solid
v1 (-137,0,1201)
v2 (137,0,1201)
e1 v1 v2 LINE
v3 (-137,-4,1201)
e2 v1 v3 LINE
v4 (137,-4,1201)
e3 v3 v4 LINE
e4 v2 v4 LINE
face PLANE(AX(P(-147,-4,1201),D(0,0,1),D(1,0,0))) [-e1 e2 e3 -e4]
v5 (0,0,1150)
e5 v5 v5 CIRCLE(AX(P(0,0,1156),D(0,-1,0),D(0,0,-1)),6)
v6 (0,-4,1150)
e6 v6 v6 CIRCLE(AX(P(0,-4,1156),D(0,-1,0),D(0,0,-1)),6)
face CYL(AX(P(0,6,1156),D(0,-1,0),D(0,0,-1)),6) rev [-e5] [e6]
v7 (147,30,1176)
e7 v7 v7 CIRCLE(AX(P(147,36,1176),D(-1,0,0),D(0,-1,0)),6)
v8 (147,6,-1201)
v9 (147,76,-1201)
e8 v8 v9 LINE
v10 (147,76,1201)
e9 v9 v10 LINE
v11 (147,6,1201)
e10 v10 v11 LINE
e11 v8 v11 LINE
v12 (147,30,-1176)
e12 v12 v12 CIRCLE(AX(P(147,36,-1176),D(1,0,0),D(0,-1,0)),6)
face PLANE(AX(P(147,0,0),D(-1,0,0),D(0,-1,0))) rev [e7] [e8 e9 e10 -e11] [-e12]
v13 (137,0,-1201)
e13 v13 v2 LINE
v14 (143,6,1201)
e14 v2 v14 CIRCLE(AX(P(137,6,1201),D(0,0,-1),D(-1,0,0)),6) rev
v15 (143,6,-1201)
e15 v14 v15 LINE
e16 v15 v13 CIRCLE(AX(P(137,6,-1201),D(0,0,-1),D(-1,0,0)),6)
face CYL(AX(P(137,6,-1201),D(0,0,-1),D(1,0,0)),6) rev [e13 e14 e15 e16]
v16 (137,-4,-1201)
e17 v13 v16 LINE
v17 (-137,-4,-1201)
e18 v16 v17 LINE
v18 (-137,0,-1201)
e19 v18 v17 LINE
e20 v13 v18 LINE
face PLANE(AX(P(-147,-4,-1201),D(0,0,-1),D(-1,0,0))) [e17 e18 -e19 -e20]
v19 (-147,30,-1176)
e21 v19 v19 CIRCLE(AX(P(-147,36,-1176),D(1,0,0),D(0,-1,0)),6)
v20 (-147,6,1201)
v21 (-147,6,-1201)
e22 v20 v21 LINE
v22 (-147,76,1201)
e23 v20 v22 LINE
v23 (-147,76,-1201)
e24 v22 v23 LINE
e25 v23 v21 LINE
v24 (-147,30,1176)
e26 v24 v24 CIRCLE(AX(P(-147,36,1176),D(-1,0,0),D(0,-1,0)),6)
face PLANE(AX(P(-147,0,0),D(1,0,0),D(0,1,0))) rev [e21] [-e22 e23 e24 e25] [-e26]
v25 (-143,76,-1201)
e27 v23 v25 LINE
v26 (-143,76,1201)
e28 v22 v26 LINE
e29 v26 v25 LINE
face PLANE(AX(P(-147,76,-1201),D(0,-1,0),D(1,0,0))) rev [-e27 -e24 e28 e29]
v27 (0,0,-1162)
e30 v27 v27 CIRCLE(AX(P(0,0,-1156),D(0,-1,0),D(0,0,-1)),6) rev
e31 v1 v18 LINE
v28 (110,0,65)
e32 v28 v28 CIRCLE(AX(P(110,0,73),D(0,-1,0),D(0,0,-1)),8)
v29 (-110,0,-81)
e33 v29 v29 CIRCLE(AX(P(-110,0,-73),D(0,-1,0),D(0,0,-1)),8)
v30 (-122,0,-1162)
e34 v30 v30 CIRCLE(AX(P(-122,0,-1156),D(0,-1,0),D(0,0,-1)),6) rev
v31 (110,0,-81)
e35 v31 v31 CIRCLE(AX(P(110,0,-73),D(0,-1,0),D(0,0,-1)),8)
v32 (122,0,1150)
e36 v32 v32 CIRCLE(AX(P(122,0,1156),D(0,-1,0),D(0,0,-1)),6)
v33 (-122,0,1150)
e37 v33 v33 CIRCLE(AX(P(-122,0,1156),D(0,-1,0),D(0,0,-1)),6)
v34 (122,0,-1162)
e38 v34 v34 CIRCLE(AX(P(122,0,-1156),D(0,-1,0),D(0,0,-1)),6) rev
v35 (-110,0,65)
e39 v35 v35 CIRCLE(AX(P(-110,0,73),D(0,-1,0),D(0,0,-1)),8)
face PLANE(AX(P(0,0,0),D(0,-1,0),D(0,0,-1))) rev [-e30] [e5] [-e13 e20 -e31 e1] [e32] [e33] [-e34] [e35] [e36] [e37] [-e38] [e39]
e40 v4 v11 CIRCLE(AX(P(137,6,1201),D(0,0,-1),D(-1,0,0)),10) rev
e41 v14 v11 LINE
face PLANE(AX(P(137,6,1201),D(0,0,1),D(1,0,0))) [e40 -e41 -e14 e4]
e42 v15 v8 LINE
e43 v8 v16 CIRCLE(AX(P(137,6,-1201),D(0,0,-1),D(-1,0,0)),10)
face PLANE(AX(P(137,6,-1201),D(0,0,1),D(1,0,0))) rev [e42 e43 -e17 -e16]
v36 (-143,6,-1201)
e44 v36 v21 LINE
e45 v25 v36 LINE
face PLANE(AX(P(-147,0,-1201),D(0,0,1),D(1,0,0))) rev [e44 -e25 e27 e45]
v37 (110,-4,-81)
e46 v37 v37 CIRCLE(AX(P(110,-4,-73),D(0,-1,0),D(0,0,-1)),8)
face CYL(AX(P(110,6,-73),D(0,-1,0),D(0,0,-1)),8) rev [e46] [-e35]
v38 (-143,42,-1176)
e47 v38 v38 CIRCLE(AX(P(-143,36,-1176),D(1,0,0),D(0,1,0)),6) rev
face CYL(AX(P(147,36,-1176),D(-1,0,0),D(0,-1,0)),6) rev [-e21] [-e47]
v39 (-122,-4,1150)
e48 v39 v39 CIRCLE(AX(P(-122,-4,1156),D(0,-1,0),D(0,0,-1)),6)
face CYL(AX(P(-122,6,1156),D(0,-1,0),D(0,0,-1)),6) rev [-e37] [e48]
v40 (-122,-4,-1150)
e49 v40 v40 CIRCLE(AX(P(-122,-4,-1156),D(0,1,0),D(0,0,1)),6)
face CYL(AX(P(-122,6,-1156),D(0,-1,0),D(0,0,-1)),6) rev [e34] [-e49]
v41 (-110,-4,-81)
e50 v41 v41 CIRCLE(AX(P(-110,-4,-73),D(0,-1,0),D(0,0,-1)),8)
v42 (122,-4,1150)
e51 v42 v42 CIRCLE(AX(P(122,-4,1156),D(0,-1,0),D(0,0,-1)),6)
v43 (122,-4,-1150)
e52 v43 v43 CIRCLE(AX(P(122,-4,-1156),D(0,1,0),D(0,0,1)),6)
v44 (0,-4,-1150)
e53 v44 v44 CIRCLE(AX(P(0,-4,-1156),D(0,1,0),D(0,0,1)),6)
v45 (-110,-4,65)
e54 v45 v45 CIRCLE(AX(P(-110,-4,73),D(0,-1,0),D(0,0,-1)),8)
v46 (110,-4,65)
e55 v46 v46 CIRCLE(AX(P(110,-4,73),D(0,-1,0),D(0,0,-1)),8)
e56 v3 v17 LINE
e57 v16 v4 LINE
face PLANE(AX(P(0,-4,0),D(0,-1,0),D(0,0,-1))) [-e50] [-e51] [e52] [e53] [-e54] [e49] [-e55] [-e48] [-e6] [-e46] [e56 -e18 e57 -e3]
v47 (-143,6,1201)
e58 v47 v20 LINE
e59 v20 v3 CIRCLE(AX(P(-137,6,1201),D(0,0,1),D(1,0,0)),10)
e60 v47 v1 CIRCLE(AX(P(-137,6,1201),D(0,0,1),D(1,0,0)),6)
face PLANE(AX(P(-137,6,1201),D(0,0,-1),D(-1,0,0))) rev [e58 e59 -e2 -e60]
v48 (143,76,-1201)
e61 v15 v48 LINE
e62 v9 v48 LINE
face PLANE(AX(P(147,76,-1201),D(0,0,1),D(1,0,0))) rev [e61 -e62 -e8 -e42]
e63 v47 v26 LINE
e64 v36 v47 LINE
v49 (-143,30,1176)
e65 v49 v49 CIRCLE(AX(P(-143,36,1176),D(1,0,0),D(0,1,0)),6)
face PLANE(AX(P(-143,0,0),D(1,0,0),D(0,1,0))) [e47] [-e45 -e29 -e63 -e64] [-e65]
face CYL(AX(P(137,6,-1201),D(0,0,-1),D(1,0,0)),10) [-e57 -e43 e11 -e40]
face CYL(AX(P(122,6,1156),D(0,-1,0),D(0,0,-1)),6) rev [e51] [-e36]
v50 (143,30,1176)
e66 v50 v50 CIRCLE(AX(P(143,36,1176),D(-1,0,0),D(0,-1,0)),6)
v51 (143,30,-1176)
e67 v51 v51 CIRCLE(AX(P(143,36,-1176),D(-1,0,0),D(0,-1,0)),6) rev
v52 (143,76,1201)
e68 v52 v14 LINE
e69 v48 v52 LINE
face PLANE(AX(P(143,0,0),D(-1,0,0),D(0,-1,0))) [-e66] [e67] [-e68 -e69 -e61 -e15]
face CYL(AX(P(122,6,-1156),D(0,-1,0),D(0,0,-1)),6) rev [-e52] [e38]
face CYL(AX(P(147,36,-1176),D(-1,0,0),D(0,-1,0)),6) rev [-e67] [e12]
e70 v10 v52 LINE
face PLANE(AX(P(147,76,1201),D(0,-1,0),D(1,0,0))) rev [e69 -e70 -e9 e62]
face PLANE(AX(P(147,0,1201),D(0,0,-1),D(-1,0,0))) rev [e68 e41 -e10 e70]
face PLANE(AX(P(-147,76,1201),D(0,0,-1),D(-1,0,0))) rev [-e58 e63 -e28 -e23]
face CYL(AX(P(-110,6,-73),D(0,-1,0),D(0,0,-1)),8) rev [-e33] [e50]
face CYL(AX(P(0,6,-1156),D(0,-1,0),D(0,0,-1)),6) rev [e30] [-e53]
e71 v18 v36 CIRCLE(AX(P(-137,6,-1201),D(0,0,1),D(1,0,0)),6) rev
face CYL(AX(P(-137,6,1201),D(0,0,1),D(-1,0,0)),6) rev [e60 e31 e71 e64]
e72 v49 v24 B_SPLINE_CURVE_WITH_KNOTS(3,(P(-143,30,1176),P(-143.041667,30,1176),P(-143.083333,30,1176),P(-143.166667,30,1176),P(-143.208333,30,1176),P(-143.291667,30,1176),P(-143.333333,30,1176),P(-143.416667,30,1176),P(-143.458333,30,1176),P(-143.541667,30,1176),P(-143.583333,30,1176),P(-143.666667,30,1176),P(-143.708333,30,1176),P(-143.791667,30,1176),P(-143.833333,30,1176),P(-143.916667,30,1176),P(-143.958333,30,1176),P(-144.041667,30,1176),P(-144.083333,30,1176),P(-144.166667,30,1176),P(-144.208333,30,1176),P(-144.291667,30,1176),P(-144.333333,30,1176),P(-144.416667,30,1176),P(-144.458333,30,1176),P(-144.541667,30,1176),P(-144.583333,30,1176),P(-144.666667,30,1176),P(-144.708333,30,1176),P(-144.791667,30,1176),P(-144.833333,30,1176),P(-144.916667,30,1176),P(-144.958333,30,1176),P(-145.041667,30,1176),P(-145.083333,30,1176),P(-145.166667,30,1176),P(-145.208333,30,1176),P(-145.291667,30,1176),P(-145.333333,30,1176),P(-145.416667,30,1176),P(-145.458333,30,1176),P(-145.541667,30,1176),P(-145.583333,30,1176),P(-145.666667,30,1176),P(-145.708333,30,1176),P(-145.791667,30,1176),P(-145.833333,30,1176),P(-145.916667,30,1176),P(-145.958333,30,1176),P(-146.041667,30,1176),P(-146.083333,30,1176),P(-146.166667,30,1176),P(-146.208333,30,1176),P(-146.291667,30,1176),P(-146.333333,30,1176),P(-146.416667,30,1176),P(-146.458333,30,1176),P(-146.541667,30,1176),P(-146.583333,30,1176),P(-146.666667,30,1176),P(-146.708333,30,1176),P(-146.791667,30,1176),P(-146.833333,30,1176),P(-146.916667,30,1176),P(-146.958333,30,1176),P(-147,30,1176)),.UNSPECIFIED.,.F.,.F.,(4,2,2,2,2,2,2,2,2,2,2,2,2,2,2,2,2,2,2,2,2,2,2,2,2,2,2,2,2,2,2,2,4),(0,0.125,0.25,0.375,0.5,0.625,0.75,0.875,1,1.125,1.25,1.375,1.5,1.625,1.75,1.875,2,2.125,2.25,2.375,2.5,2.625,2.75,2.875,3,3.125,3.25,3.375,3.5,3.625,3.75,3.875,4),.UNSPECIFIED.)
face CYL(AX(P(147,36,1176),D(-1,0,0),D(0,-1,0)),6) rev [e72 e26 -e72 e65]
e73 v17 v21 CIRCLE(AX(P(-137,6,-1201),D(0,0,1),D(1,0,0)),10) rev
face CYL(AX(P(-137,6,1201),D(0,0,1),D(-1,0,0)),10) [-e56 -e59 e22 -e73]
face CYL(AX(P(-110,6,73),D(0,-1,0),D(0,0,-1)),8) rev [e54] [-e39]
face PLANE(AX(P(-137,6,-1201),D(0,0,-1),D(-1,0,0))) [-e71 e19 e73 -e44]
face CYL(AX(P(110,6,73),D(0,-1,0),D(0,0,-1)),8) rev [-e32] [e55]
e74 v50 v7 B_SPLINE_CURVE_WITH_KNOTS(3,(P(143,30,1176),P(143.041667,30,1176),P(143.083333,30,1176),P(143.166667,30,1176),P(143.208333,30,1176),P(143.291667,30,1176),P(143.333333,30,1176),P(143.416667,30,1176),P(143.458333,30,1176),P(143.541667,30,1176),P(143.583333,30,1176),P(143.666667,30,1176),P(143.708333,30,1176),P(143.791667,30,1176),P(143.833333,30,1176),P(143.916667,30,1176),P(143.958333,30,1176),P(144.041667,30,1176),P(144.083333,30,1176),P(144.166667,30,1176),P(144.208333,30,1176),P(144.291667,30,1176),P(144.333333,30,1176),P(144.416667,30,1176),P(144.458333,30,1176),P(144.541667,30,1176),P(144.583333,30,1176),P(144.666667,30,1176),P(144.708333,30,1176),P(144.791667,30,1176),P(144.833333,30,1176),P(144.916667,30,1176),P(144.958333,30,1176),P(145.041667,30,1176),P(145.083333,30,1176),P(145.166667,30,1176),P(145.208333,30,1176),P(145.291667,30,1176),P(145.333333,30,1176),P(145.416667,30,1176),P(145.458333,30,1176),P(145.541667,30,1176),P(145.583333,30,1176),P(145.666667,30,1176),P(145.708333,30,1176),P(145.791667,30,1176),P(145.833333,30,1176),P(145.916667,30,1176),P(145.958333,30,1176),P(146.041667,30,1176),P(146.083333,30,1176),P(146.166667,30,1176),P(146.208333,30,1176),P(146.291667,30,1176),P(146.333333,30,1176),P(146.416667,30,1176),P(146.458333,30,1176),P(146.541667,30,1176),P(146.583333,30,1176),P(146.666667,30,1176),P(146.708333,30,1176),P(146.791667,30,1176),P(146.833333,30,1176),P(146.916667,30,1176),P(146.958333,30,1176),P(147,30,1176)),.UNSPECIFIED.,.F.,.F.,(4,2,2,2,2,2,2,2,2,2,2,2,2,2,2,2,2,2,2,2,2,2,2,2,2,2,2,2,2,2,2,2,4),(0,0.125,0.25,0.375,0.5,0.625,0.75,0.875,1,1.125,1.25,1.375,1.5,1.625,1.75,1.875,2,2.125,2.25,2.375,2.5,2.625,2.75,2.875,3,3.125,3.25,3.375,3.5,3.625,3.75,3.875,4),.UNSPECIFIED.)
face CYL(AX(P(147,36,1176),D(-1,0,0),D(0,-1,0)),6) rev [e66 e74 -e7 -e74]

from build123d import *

# Parameters (mm, degrees)
SKETCH1_W                      = 294
SKETCH1_H                      = 2402
BASE_FLANGE1_DEPTH             = 4
EDGE_FLANGE1_STRIP_W           = 28
EDGE_FLANGE1_STRIP_H           = 4
EDGE_FLANGE1_STRIP_CUT_DEPTH   = 2402
EDGE_FLANGE1_STRIP_2_W         = 28
EDGE_FLANGE1_STRIP_2_H         = 4
EDGE_FLANGE1_STRIP_CUT_2_DEPTH = 2402
EDGE_FLANGE1_DEPTH             = 2402
EDGE_FLANGE1_BEND_DEPTH        = 2402
SKETCH20_R                     = 8
CUT_EXTRUDE3_DEPTH             = 10
LPATTERN1_COUNT                = 2
LPATTERN1_PITCH                = 220
LPATTERN1_COUNT_DIR2           = 2
LPATTERN1_PITCH_DIR2           = 146
SKETCH21_R                     = 6
CUT_EXTRUDE4_DEPTH             = 10
SKETCH22_R                     = 6
CUT_EXTRUDE5_DEPTH             = 10
SKETCH23_R                     = 6
CUT_EXTRUDE6_DEPTH             = 1239.794979002


# Sheet-metal steps are written as plain solids
with BuildPart() as part:
    # Sketch1 → Base-Flange1 (new body)
    with BuildSketch(Plane(origin=(0, 0, 0), x_dir=(1, 0, 0), z_dir=(0, 1, 0))):
        Rectangle(SKETCH1_W, SKETCH1_H)
    extrude(amount=-BASE_FLANGE1_DEPTH)

    # Edge-Flange1 strip (across the edge) → Edge-Flange1 strip cut (cut)
    with BuildSketch(Plane(origin=(147, 0, 1201), x_dir=(-1, 0, 0), z_dir=(0, 0, -1))):
        with Locations((-4, -2)):
            Rectangle(EDGE_FLANGE1_STRIP_W, EDGE_FLANGE1_STRIP_H)
    extrude(amount=EDGE_FLANGE1_STRIP_CUT_DEPTH, mode=Mode.SUBTRACT)

    # Edge-Flange1 strip 2 (across the edge) → Edge-Flange1 strip cut 2 (cut)
    with BuildSketch(Plane(origin=(-147, 0, -1201), x_dir=(1, 0, 0), z_dir=(0, 0, 1))):
        with Locations((-4, -2)):
            Rectangle(EDGE_FLANGE1_STRIP_2_W, EDGE_FLANGE1_STRIP_2_H)
    extrude(amount=EDGE_FLANGE1_STRIP_CUT_2_DEPTH, mode=Mode.SUBTRACT)

    # Edge-Flange1 section (across the edge) → Edge-Flange1 (add)
    with BuildSketch(Plane(origin=(147, 0, 1201), x_dir=(-1, 0, 0), z_dir=(0, 0, -1))):
        with BuildLine():
            Line((0, 6), (0, 76))
            Line((0, 76), (4, 76))
            Line((4, 76), (4, 6))
            ThreePointArc((4, 6), (5.757359313, 1.757359313), (10, 0))
            Line((10, 0), (10, -4))
            ThreePointArc((10, -4), (2.928932188, -1.071067812), (0, 6))
        make_face()
    extrude(amount=EDGE_FLANGE1_DEPTH)

    # Edge-Flange1 section 2 (across the edge) → Edge-Flange1 bend (add)
    with BuildSketch(Plane(origin=(-147, 0, -1201), x_dir=(1, 0, 0), z_dir=(0, 0, 1))):
        with BuildLine():
            Line((0, 6), (0, 76))
            Line((0, 76), (4, 76))
            Line((4, 76), (4, 6))
            ThreePointArc((4, 6), (5.757359313, 1.757359313), (10, 0))
            Line((10, 0), (10, -4))
            ThreePointArc((10, -4), (2.928932188, -1.071067812), (0, 6))
        make_face()
    extrude(amount=EDGE_FLANGE1_BEND_DEPTH)

    # Sketch20 → Cut-Extrude3 (cut)
    with BuildSketch(Plane.XZ.offset(4)):
        with Locations(Location((-110, 73, 0), (0, 0, 270))):
            Circle(SKETCH20_R)
    cut_extrude3 = extrude(amount=-CUT_EXTRUDE3_DEPTH, mode=Mode.SUBTRACT)

    # LPattern1: Cut-Extrude3 2 × 2
    with Locations(*[(i * LPATTERN1_PITCH, 0, -j * LPATTERN1_PITCH_DIR2) for i in range(LPATTERN1_COUNT) for j in range(LPATTERN1_COUNT_DIR2) if (i, j) != (0, 0)]):
        add(cut_extrude3, mode=Mode.SUBTRACT)

    # Sketch21 → Cut-Extrude4 (cut)
    with BuildSketch(Plane.XZ.offset(4)):
        with Locations(Location((-122, 1156, 0), (0, 0, 270))):
            Circle(SKETCH21_R)
        with Locations(Location((122, 1156, 0), (0, 0, 270))):
            Circle(SKETCH21_R)
    cut_extrude4 = extrude(amount=-CUT_EXTRUDE4_DEPTH, mode=Mode.SUBTRACT)

    # Sketch22 → Cut-Extrude5 (cut)
    with BuildSketch(Plane.XZ.offset(4)):
        with Locations(Location((0, 1156, 0), (0, 0, 270))):
            Circle(SKETCH22_R)
    cut_extrude5 = extrude(amount=-CUT_EXTRUDE5_DEPTH, mode=Mode.SUBTRACT)

    # Sketch23 → Cut-Extrude6 (cut, through all)
    with BuildSketch(Plane.ZY.offset(147)):
        with Locations(Location((1176, 36, 0), (0, 0, 270))):
            Circle(SKETCH23_R)
    cut_extrude6 = extrude(amount=-CUT_EXTRUDE6_DEPTH, mode=Mode.SUBTRACT)

    # Mirror1: Cut-Extrude4, Cut-Extrude5, Cut-Extrude6 across plane
    add(cut_extrude4.mirror(Plane.XY), mode=Mode.SUBTRACT)
    add(cut_extrude5.mirror(Plane.XY), mode=Mode.SUBTRACT)
    add(cut_extrude6.mirror(Plane.XY), mode=Mode.SUBTRACT)


solid = part.part
